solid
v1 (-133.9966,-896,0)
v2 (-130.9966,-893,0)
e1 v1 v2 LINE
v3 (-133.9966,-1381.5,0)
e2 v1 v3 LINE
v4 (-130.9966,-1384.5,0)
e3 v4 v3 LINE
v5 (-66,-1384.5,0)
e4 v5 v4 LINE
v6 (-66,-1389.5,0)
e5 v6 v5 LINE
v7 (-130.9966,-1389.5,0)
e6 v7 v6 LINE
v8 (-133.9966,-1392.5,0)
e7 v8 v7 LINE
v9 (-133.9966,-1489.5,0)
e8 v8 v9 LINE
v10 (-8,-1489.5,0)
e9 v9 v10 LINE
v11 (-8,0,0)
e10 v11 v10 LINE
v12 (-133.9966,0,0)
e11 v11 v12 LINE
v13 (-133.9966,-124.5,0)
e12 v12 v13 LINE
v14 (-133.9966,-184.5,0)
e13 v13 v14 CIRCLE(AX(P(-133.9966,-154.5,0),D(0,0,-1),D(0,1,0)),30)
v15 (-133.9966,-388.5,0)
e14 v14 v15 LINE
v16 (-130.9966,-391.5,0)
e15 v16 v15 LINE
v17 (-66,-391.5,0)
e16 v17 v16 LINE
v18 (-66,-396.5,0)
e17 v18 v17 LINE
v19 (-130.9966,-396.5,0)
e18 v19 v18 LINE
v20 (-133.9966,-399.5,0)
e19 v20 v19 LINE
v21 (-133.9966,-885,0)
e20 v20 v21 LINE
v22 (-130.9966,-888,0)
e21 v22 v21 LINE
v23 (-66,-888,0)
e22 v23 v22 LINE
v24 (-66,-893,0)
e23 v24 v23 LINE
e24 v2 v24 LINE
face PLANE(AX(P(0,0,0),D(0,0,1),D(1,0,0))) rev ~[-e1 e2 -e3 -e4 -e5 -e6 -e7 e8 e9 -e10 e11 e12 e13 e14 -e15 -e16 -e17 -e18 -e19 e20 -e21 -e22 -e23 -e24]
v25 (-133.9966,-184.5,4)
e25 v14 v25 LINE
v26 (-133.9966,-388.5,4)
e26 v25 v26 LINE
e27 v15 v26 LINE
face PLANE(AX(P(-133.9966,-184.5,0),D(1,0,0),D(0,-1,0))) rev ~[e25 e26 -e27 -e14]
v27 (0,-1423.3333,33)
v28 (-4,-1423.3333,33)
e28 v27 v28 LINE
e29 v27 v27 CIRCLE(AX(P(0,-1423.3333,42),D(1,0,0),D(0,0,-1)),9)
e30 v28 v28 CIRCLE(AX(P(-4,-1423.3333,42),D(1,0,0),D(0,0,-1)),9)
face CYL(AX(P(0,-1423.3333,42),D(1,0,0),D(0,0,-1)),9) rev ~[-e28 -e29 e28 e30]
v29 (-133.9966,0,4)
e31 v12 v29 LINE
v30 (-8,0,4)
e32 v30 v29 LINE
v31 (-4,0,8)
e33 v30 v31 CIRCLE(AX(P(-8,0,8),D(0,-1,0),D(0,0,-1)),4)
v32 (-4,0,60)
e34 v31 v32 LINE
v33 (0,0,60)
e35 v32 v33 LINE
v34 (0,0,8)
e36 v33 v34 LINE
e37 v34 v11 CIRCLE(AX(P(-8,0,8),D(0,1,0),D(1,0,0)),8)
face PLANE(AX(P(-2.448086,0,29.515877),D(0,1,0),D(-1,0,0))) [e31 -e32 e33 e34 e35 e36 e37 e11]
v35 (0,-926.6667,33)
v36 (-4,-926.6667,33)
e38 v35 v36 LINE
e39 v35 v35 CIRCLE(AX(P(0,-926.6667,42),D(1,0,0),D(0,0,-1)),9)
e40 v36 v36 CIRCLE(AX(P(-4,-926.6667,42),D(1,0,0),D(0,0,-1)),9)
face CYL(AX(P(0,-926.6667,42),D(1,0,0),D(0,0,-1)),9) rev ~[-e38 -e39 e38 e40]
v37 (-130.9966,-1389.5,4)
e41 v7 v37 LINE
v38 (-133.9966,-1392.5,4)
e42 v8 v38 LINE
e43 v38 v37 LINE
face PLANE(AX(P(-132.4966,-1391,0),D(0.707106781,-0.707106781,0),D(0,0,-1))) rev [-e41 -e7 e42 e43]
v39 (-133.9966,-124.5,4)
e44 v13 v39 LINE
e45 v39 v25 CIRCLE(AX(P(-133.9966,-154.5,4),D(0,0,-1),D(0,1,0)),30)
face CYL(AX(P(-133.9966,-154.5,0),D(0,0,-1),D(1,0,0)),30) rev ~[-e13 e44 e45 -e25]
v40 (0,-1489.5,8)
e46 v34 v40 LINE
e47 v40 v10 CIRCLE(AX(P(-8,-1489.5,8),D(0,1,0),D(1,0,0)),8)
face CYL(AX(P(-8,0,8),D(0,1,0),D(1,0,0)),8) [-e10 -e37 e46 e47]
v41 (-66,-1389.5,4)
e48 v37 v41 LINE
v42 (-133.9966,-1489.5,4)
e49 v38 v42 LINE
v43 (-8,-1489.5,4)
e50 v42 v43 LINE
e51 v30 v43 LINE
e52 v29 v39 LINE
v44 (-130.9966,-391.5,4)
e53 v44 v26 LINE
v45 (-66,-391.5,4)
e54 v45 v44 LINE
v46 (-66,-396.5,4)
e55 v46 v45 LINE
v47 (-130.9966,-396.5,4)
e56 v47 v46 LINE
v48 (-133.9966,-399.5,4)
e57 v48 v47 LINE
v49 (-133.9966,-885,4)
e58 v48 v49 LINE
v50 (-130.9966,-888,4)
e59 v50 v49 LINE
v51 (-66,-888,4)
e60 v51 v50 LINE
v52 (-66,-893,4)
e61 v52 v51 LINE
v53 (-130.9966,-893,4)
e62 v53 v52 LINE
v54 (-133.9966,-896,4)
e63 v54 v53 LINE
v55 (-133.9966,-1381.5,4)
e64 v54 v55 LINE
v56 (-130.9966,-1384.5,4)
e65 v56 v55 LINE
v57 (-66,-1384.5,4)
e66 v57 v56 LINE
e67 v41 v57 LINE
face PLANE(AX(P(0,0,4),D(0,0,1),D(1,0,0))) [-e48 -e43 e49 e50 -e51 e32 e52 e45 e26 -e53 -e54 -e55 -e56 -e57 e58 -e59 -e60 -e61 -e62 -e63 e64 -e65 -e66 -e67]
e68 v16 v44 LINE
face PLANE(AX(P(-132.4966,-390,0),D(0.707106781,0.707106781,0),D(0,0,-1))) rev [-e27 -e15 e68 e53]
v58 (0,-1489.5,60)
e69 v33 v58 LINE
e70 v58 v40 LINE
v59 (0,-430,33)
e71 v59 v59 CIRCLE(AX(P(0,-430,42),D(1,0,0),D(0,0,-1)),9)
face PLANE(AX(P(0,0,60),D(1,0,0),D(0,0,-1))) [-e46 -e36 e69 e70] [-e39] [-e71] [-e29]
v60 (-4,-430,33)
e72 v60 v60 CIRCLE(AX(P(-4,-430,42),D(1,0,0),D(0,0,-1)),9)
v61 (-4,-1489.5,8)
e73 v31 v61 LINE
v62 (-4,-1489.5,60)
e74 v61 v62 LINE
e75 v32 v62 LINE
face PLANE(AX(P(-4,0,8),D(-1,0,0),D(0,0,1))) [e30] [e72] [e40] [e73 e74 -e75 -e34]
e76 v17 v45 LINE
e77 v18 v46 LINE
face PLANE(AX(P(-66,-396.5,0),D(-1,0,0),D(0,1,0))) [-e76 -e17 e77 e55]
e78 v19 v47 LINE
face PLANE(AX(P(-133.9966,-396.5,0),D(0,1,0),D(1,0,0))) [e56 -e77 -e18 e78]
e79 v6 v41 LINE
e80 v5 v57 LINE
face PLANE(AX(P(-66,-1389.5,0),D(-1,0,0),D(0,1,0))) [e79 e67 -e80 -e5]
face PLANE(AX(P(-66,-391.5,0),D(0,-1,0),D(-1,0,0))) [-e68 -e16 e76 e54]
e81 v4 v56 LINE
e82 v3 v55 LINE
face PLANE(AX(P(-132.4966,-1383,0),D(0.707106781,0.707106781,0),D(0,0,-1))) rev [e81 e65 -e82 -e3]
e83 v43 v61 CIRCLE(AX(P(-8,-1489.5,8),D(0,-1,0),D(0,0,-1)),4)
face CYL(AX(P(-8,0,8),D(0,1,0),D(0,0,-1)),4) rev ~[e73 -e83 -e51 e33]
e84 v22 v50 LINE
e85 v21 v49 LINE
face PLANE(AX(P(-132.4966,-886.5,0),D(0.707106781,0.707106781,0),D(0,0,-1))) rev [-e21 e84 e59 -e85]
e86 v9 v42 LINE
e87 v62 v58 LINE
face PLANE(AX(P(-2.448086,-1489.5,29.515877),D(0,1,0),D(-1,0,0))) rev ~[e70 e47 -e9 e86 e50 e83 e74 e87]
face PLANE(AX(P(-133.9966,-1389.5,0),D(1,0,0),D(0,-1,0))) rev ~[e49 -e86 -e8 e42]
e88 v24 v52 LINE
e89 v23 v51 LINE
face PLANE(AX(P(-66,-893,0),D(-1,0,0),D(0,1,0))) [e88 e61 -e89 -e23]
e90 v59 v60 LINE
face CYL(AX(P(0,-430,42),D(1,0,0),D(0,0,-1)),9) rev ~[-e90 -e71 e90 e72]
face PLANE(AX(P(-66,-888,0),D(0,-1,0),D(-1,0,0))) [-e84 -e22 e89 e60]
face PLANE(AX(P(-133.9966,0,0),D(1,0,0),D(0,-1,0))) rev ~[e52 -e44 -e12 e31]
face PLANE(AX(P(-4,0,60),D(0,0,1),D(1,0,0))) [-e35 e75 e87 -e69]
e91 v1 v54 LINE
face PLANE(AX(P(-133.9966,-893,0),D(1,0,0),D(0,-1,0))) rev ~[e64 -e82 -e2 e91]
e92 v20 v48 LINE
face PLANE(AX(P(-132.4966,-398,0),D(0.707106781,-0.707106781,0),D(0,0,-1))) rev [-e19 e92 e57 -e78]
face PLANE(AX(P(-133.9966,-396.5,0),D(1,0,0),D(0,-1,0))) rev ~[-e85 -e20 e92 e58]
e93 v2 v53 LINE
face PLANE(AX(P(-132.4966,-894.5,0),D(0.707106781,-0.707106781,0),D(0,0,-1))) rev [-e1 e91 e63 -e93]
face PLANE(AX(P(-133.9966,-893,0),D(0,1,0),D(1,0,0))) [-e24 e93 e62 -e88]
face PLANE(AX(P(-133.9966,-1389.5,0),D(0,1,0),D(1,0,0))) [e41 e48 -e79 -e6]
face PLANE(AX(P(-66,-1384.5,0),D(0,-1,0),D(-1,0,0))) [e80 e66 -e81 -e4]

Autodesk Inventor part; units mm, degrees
ref_plane "YZ Plane" through (0, 0, 0) normal (1, 0, 0) x (0, 1, 0)
ref_plane "XZ Plane" through (0, 0, 0) normal (0, 1, 0) x (-1, 0, 0)
ref_plane "XY Plane" through (0, 0, 0) normal (0, 0, 1) x (1, 0, 0)
sketch "Sketch1" plane through (0, 0, 0) normal (0, 0, 1) x (1, 0, 0)
  line L0 (0, 0) -> (-133.9966, 0)
  line L1 (-133.9966, 0) -> (-133.9966, -1489.5)
  line L2 (-133.9966, -1489.5) -> (0, -1489.5)
  line L3 (0, -1489.5) -> (0, 0)
  line L4 (-133.9966, -1389.5) -> (-66, -1389.5)
  line L5 (-66, -1389.5) -> (-66, -1384.5)
  line L6 (-66, -1384.5) -> (-133.9966, -1384.5)
  line L7 (-133.9966, -1384.5) -> (-133.9966, -1389.5)
  line L8 (-133.9966, -893) -> (-66, -893)
  line L9 (-66, -893) -> (-66, -888)
  line L10 (-66, -888) -> (-133.9966, -888)
  line L11 (-133.9966, -888) -> (-133.9966, -893)
  line L12 (-133.9966, -396.5) -> (-66, -396.5)
  line L13 (-66, -396.5) -> (-66, -391.5)
  line L14 (-66, -391.5) -> (-133.9966, -391.5)
  line L15 (-133.9966, -391.5) -> (-133.9966, -396.5)
  circle A0 centre (-133.9966, -154.5) radius 30
  point P0 (-133.9966, -391.5)
  point P1 (-133.9966, -124.5)
  point P2 (-133.9966, -184.5)
  dimension "d0" = 1489.5
  dimension "d1" = 133.9966
  dimension "d2" = 5
  dimension "d4" = 100
  dimension "d7" = 496.5
  dimension "d23" = 66
  dimension "d28" = 60
  dimension "d29" = 1335
extrude "Plate1" add sketch "Sketch1" along normal blind 4 contours L3 L2 L1 L4 L5 L6 L8 L9 L10 L12 L13 L14 A0 L0
sketch "Sketch2" plane through (-4, 0, 0) normal (1, 0, 0) x (0, 1, 0)
  line L0 (-1489.5, 0) -> (0, 0)
  line L1 (0, 0) -> (0, 60)
  line L2 (0, 60) -> (-1489.5, 60)
  line L3 (-1489.5, 60) -> (-1489.5, 0)
edge flange "Flange1" height 60 angle 90 thickness 4 bend radius 4 thickness toward (1, 0, 0) relief tear relief width 4 relief depth 2 edges at (0, -744.75, 4) wall of the first edge with corners at (-4, -1489.5, 0) (-4, 0, 0) (-4, 0, 60) (-4, -1489.5, 60)
bend "Bend1"
corner "Corner1"
chamfer "Corner Chamfer1" distance 3 angle 45 6 edges at (-133.9966, -1389.5, 2) (-133.9966, -1384.5, 2) (-133.9966, -893, 2) (-133.9966, -888, 2) (-133.9966, -391.5, 2) (-133.9966, -396.5, 2)
sketch "Sketch4" plane through (0, -1489.5, 60) normal (1, 0, 0) x (0, 0, -1)
  circle A0 centre (18, 1059.5) radius 9
  line L0 (0, 1489.5) -> (52, 1489.5) projected
  line L1 (0, 0) -> (0, 1489.5) projected
  circle A1 centre (18, 562.8333) radius 9
  circle A2 centre (18, 66.1667) radius 9
  point P0 (60, 1489.5)
  dimension "d30" = 430
  dimension "d31" = 18
  dimension "d32" = 18
  dimension "d35" = 496.6667
extrude "Cut1" cut sketch "Sketch4" against normal blind 4
equation "\"d0\" = Стрингер_длина"
equation "\"d1\" = стрингер_глубина_6"
equation "\"d2\" = паз_под_стрингер_толщина"
equation "\"d7\" = 0.333333 * Стрингер_длина"
equation "\"d23\" = паз_под_стрингер_глубина - Thickness"
equation "\"d28\" = 2 * радиус_выреза_под_сварку"
equation "\"d35\" = Шаг_шпангоутов"
equation "\"d40\" = Thickness"
equation "\"d12\" = Thickness"
equation "\"d13\" = BendReliefWidth"
equation "\"d14\" = BendReliefDepth"
equation "\"d15\" = MinimumRemnant"
equation "\"d16\" = TransitionRadius"
equation "\"d17\" = ребро_усилителей"
equation "\"d19\" = BendRadius"
equation "\"d20\" = CornerReliefSize"
equation "\"d21\" = GapSize"
equation "\"d22\" = JacobiRadiusSize"
equation "\"BendRadius\" = Thickness"
equation "\"BendReliefWidth\" = Thickness"
equation "\"BendReliefDepth\" = 0.5 * Thickness"
equation "\"CornerReliefSize\" = 4 * Thickness"
equation "\"MinimumRemnant\" = 2 * Thickness"
equation "\"TransitionRadius\" = BendRadius"
equation "\"JacobiRadiusSize\" = BendRadius"
equation "\"GapSize\" = Thickness"
equation "\"Стрингер_длина\" = 1489.5"
equation "\"стрингер_глубина_6\" = 133.996634"
equation "\"паз_под_стрингер_толщина\" = 5"
equation "\"паз_под_стрингер_глубина\" = 70"
equation "\"Thickness\" = 4"
equation "\"радиус_выреза_под_сварку\" = 30"
equation "\"Шаг_шпангоутов\" = 496.666667"
equation "\"ребро_усилителей\" = 60"
properties part number "GBK 0204 stringer 6" material "Steel"
